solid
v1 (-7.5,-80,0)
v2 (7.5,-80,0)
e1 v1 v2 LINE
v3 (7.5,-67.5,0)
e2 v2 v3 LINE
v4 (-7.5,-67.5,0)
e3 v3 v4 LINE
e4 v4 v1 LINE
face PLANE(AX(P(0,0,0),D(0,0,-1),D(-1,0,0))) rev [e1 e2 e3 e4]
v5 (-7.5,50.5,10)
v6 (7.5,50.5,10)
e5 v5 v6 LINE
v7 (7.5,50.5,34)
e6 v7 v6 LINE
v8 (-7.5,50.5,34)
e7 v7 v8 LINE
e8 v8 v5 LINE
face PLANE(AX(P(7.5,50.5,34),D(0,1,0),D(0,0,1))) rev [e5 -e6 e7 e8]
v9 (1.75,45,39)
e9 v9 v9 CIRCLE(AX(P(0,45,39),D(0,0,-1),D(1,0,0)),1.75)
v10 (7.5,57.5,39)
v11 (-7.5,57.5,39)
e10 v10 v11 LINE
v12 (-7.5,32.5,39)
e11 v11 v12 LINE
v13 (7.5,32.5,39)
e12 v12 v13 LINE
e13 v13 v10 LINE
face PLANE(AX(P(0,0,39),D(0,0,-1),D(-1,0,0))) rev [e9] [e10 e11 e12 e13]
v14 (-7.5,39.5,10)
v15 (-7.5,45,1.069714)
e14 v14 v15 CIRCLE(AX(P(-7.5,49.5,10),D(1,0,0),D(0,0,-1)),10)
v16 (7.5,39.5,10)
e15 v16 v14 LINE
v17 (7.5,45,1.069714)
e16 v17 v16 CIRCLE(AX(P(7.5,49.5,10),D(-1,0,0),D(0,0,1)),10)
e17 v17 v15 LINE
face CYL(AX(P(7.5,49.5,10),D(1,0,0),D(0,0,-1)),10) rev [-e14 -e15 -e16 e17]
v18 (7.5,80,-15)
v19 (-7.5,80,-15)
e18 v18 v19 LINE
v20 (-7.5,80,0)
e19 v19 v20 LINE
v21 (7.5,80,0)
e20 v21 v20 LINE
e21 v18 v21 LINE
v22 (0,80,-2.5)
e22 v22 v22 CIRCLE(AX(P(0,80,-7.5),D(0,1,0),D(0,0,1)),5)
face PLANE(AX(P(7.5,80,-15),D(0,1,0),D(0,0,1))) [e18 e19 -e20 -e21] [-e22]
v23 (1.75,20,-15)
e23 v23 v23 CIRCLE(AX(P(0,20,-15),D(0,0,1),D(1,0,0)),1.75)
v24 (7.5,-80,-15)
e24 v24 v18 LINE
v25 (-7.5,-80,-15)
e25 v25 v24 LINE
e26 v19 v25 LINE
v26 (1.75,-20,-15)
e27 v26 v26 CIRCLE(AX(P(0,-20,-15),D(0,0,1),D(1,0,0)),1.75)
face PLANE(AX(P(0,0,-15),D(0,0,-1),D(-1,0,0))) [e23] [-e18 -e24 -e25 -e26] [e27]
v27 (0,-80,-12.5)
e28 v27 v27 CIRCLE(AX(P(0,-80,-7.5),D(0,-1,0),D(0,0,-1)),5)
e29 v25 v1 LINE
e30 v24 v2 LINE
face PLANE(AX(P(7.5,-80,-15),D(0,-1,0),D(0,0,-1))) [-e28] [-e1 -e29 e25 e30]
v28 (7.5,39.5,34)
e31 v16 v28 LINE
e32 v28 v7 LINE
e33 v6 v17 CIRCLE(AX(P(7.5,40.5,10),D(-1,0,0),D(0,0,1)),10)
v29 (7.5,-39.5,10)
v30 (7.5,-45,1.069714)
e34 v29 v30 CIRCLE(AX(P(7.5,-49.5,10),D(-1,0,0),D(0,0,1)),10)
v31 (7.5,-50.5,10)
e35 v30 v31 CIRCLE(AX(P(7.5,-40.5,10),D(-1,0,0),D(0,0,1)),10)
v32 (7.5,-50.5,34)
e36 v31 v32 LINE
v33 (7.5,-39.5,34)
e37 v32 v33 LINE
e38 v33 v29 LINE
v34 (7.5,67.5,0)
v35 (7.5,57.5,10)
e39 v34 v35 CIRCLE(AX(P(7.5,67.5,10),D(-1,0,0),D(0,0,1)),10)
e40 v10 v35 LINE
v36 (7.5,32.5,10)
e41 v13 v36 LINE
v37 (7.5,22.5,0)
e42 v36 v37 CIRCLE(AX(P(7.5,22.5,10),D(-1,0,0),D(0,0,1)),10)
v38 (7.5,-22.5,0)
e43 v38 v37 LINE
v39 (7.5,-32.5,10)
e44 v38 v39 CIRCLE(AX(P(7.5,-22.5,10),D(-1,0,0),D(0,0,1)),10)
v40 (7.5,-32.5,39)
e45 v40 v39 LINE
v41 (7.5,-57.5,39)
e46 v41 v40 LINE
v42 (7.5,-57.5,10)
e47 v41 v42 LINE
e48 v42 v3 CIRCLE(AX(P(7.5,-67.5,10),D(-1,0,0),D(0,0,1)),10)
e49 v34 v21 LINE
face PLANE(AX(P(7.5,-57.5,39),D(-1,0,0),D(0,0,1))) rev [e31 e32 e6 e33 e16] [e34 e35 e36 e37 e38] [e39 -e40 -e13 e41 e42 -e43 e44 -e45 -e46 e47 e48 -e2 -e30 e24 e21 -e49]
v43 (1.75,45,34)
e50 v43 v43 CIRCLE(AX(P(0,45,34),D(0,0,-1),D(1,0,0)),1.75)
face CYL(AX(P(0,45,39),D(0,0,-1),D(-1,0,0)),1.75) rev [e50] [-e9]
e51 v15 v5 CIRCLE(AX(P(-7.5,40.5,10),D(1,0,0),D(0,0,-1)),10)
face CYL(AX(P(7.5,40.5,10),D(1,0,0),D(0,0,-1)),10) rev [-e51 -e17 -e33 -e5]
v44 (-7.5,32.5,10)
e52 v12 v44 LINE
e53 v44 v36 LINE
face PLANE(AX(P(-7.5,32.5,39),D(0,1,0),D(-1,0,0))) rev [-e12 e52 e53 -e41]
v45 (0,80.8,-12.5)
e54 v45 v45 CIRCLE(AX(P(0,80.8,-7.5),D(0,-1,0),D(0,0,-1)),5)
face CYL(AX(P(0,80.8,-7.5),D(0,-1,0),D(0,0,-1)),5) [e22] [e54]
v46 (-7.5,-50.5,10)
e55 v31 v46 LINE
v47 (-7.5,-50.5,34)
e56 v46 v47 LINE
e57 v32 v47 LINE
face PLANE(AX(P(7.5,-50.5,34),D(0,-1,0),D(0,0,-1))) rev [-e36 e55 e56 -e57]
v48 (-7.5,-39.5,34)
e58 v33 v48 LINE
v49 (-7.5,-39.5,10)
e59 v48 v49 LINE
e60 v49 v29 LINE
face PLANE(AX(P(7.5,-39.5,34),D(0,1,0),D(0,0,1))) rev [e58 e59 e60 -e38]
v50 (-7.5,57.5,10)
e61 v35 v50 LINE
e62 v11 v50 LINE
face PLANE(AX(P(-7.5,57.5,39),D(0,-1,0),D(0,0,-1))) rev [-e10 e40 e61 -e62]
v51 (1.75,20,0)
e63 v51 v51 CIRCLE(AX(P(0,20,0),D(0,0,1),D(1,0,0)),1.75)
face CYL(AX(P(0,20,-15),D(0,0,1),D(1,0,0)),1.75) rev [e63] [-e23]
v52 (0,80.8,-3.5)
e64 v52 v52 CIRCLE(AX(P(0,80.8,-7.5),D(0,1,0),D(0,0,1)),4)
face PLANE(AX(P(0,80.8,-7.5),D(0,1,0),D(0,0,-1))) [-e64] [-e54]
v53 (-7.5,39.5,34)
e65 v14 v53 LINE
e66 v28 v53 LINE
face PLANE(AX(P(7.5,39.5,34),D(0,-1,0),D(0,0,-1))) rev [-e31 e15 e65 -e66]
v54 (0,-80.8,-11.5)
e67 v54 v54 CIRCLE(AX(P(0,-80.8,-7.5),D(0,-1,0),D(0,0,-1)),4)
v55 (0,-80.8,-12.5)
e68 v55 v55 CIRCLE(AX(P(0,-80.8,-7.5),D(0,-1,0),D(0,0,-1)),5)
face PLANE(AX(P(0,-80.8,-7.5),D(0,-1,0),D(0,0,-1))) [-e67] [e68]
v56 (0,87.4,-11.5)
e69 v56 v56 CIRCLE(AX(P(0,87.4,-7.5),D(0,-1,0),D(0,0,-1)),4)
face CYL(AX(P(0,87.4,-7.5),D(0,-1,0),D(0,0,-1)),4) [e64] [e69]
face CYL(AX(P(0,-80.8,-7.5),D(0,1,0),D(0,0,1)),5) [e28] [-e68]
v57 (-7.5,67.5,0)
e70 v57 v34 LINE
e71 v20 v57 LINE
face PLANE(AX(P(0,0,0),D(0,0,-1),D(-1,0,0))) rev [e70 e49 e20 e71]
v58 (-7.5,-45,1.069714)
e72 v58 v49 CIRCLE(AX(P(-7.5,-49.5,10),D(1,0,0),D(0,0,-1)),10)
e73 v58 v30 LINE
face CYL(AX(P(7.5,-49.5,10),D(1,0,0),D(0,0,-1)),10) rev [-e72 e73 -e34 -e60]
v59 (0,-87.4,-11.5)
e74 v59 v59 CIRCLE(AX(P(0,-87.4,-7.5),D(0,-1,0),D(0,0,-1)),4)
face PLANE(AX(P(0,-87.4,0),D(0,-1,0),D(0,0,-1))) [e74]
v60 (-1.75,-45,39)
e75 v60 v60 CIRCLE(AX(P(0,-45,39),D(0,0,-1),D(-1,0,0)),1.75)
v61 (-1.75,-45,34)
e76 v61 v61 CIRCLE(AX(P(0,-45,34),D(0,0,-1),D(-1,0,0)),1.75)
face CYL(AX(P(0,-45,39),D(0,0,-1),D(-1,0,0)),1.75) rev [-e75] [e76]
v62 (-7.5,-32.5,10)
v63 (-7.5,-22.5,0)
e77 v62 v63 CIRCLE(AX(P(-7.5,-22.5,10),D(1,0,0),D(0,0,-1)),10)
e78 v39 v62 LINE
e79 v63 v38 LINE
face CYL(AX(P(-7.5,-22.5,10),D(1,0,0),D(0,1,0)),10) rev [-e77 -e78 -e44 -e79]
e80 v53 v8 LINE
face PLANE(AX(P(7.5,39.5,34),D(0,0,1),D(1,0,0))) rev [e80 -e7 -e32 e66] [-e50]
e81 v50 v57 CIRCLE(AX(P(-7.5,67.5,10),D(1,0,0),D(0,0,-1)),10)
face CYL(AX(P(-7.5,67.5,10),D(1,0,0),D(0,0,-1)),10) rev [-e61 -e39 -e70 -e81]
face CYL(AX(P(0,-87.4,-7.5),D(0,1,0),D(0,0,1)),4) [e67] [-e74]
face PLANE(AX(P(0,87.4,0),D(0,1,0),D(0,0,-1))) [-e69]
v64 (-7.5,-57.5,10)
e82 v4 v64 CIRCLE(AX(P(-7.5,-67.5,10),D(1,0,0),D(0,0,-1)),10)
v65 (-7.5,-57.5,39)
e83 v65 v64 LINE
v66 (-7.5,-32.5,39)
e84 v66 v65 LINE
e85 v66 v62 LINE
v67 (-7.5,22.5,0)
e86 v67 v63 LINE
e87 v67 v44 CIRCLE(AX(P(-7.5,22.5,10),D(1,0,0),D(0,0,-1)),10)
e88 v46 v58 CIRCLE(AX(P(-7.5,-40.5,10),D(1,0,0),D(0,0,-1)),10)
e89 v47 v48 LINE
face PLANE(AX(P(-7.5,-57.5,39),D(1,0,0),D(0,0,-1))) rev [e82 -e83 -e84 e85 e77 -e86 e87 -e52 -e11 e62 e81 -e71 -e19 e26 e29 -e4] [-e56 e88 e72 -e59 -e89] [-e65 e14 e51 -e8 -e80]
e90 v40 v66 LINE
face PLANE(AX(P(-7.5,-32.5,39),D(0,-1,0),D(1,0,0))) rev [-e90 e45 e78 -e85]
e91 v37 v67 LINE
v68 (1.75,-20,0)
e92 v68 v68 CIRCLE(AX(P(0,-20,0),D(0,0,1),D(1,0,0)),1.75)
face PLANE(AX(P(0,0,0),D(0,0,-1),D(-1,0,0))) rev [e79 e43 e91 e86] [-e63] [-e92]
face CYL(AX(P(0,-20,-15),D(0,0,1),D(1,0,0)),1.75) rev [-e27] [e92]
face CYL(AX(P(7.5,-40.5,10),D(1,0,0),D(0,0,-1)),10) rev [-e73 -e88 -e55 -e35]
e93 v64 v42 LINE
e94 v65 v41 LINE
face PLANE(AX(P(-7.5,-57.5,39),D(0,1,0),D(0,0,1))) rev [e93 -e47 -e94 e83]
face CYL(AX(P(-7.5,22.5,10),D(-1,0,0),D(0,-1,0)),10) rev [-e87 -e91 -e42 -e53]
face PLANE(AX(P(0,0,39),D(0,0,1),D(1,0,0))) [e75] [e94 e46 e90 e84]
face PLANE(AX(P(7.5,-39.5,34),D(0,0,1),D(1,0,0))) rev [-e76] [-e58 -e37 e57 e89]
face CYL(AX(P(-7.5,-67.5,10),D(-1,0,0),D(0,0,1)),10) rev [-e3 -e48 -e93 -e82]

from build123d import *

# Parameters (mm, degrees)
ESQUISSE1_W                      = 25
ESQUISSE1_H                      = 15
BOSS_EXTRU_1_DEPTH               = 39
BOSS_EXTRU_1_2_DEPTH             = 39
ESQUISSE3_W                      = 160
ESQUISSE3_H                      = 15
BOSS_EXTRU_2_DEPTH               = 15
ESQUISSE4_R                      = 5
ESQUISSE4_R_2                    = 4
BOSS_EXTRU_5_DEPTH               = 0.8
ESQUISSE4_6_R                    = 4
BOSS_EXTRU_6_DEPTH               = 7.4
CONG_1_R                         = 10
ESQUISSE5_W                      = 11
ESQUISSE5_H                      = 34
ENL_V_MAT_EXTRU_1_DEPTH          = 97.874970968
CONG_2_R                         = 10
ESQUISSE6_R                      = 1.75
ENL_V_MAT_EXTRU_2_DEPTH          = 101.478903258
ESQUISSE11_R                     = 1.75
TROUS_VIS_SUPPORT_CAPTEURS_DEPTH = 97.000052083


with BuildPart() as part:
    # Esquisse1 → Boss.-Extru.1 (new body)
    with BuildSketch(Plane(origin=(0, 0, 0), x_dir=(0, 1, 0), z_dir=(0, 0, 1))):
        with Locations((-45, 0)):
            Rectangle(ESQUISSE1_W, ESQUISSE1_H)
    extrude(amount=BOSS_EXTRU_1_DEPTH)



with BuildPart() as body_2:
    # Esquisse1 → Boss.-Extru.1 2 (new body)
    with BuildSketch(Plane(origin=(0, 0, 0), x_dir=(0, 1, 0), z_dir=(0, 0, 1))):
        with Locations((45, 0)):
            Rectangle(ESQUISSE1_W, ESQUISSE1_H)
    extrude(amount=BOSS_EXTRU_1_2_DEPTH)


with BuildPart() as part_1:
    add(part.part)

    add(body_2.part)  # Boss.-Extru.2 merges body 2
    # Esquisse3 → Boss.-Extru.2 (add)
    with BuildSketch(Plane(origin=(0, 0, 0), x_dir=(0, 1, 0), z_dir=(0, 0, 1))):
        Rectangle(ESQUISSE3_W, ESQUISSE3_H)
    extrude(amount=-BOSS_EXTRU_2_DEPTH)

    # Esquisse4 → Boss.-Extru.5 (add)
    with BuildSketch(Plane(origin=(0, -80, 0), x_dir=(-1, 0, 0), z_dir=(0, -1, 0))):
        with Locations(Location((0, 7.5, 0), (0, 0, 90))):
            Circle(ESQUISSE4_R)
        with Locations(Location((0, 7.5, 0), (0, 0, 90))):
            Circle(ESQUISSE4_R_2, mode=Mode.SUBTRACT)
    boss_extru_5 = extrude(amount=BOSS_EXTRU_5_DEPTH)

    # Esquisse4<6> → Boss.-Extru.6 (add)
    with BuildSketch(Plane(origin=(0, -80, 0), x_dir=(-1, 0, 0), z_dir=(0, -1, 0))):
        with Locations(Location((0, 7.5, 0), (0, 0, 90))):
            Circle(ESQUISSE4_6_R)
    boss_extru_6 = extrude(amount=BOSS_EXTRU_6_DEPTH)

    # Symétrie2: Boss.-Extru.5, Boss.-Extru.6 across plane
    add(boss_extru_5.mirror(Plane.ZX))
    add(boss_extru_6.mirror(Plane.ZX))

    # Congé1
    cong_1_edges = [part_1.edges().sort_by_distance(p)[0] for p in [
        (0, 57.5, 0),
        (0, 32.5, 0),
        (0, -57.5, 0),
        (0, -32.5, 0),
    ]]
    fillet(cong_1_edges, radius=CONG_1_R)

    # Esquisse5 → Enlèv. mat.-Extru.1 (cut, through all)
    with BuildSketch(Plane(origin=(-7.5, 0, 0), x_dir=(0, -1, 0), z_dir=(-1, 0, 0))):
        with Locations((45, 17)):
            Rectangle(ESQUISSE5_W, ESQUISSE5_H)
        with Locations((-45, 17)):
            Rectangle(ESQUISSE5_W, ESQUISSE5_H)
    extrude(amount=-ENL_V_MAT_EXTRU_1_DEPTH, mode=Mode.SUBTRACT)

    # Congé2
    # the kernel refuses this fillet: 10 mm, written as the material it adds along each edge
    with BuildSketch(Plane(origin=(-7.5, 39.5, 0), x_dir=(0, 0, 1), z_dir=(1, 0, 0)), Plane(origin=(-7.5, -39.5, 0), x_dir=(0, -1, 0), z_dir=(1, 0, 0)), Plane(origin=(-7.5, -50.5, 0), x_dir=(0, 0, 1), z_dir=(1, 0, 0))) as cong_2_piece_1:
        with BuildLine():
            CenterArc((CONG_2_R, -CONG_2_R), CONG_2_R, 90, 90)
            Line((0, -CONG_2_R), (0, 0))
            Line((0, 0), (CONG_2_R, 0))
        make_face()
    extrude(amount=15)
    with BuildSketch(Plane(origin=(-7.5, 50.5, 0), x_dir=(0, 0, 1), z_dir=(1, 0, 0))) as cong_2_piece_2:
        with BuildLine():
            CenterArc((CONG_2_R, CONG_2_R), CONG_2_R, 180, 90)
            Line((0, CONG_2_R), (0, 0))
            Line((0, 0), (CONG_2_R, 0))
        make_face()
    extrude(amount=15)

    # Esquisse6 → Enlèv. mat.-Extru.2 (cut, through all)
    with BuildSketch(Plane(origin=(0, 0, 34), x_dir=(1, 0, 0), z_dir=(0, 0, -1))):
        with Locations(Location((0, 45, 0), (0, 0, 180))):
            Circle(ESQUISSE6_R)
        with Locations((0, -45)):
            Circle(ESQUISSE6_R)
    extrude(amount=-ENL_V_MAT_EXTRU_2_DEPTH, mode=Mode.SUBTRACT)

    # Esquisse11 → Trous vis support capteurs (cut, through all)
    with BuildSketch(Plane(origin=(0, 0, 0), x_dir=(0, 1, 0), z_dir=(0, 0, 1))):
        with Locations(Location((20, 0, 0), (0, 0, 270))):
            Circle(ESQUISSE11_R)
        with Locations(Location((-20, 0, 0), (0, 0, 270))):
            Circle(ESQUISSE11_R)
    extrude(amount=-TROUS_VIS_SUPPORT_CAPTEURS_DEPTH, mode=Mode.SUBTRACT)


solid = part_1.part
